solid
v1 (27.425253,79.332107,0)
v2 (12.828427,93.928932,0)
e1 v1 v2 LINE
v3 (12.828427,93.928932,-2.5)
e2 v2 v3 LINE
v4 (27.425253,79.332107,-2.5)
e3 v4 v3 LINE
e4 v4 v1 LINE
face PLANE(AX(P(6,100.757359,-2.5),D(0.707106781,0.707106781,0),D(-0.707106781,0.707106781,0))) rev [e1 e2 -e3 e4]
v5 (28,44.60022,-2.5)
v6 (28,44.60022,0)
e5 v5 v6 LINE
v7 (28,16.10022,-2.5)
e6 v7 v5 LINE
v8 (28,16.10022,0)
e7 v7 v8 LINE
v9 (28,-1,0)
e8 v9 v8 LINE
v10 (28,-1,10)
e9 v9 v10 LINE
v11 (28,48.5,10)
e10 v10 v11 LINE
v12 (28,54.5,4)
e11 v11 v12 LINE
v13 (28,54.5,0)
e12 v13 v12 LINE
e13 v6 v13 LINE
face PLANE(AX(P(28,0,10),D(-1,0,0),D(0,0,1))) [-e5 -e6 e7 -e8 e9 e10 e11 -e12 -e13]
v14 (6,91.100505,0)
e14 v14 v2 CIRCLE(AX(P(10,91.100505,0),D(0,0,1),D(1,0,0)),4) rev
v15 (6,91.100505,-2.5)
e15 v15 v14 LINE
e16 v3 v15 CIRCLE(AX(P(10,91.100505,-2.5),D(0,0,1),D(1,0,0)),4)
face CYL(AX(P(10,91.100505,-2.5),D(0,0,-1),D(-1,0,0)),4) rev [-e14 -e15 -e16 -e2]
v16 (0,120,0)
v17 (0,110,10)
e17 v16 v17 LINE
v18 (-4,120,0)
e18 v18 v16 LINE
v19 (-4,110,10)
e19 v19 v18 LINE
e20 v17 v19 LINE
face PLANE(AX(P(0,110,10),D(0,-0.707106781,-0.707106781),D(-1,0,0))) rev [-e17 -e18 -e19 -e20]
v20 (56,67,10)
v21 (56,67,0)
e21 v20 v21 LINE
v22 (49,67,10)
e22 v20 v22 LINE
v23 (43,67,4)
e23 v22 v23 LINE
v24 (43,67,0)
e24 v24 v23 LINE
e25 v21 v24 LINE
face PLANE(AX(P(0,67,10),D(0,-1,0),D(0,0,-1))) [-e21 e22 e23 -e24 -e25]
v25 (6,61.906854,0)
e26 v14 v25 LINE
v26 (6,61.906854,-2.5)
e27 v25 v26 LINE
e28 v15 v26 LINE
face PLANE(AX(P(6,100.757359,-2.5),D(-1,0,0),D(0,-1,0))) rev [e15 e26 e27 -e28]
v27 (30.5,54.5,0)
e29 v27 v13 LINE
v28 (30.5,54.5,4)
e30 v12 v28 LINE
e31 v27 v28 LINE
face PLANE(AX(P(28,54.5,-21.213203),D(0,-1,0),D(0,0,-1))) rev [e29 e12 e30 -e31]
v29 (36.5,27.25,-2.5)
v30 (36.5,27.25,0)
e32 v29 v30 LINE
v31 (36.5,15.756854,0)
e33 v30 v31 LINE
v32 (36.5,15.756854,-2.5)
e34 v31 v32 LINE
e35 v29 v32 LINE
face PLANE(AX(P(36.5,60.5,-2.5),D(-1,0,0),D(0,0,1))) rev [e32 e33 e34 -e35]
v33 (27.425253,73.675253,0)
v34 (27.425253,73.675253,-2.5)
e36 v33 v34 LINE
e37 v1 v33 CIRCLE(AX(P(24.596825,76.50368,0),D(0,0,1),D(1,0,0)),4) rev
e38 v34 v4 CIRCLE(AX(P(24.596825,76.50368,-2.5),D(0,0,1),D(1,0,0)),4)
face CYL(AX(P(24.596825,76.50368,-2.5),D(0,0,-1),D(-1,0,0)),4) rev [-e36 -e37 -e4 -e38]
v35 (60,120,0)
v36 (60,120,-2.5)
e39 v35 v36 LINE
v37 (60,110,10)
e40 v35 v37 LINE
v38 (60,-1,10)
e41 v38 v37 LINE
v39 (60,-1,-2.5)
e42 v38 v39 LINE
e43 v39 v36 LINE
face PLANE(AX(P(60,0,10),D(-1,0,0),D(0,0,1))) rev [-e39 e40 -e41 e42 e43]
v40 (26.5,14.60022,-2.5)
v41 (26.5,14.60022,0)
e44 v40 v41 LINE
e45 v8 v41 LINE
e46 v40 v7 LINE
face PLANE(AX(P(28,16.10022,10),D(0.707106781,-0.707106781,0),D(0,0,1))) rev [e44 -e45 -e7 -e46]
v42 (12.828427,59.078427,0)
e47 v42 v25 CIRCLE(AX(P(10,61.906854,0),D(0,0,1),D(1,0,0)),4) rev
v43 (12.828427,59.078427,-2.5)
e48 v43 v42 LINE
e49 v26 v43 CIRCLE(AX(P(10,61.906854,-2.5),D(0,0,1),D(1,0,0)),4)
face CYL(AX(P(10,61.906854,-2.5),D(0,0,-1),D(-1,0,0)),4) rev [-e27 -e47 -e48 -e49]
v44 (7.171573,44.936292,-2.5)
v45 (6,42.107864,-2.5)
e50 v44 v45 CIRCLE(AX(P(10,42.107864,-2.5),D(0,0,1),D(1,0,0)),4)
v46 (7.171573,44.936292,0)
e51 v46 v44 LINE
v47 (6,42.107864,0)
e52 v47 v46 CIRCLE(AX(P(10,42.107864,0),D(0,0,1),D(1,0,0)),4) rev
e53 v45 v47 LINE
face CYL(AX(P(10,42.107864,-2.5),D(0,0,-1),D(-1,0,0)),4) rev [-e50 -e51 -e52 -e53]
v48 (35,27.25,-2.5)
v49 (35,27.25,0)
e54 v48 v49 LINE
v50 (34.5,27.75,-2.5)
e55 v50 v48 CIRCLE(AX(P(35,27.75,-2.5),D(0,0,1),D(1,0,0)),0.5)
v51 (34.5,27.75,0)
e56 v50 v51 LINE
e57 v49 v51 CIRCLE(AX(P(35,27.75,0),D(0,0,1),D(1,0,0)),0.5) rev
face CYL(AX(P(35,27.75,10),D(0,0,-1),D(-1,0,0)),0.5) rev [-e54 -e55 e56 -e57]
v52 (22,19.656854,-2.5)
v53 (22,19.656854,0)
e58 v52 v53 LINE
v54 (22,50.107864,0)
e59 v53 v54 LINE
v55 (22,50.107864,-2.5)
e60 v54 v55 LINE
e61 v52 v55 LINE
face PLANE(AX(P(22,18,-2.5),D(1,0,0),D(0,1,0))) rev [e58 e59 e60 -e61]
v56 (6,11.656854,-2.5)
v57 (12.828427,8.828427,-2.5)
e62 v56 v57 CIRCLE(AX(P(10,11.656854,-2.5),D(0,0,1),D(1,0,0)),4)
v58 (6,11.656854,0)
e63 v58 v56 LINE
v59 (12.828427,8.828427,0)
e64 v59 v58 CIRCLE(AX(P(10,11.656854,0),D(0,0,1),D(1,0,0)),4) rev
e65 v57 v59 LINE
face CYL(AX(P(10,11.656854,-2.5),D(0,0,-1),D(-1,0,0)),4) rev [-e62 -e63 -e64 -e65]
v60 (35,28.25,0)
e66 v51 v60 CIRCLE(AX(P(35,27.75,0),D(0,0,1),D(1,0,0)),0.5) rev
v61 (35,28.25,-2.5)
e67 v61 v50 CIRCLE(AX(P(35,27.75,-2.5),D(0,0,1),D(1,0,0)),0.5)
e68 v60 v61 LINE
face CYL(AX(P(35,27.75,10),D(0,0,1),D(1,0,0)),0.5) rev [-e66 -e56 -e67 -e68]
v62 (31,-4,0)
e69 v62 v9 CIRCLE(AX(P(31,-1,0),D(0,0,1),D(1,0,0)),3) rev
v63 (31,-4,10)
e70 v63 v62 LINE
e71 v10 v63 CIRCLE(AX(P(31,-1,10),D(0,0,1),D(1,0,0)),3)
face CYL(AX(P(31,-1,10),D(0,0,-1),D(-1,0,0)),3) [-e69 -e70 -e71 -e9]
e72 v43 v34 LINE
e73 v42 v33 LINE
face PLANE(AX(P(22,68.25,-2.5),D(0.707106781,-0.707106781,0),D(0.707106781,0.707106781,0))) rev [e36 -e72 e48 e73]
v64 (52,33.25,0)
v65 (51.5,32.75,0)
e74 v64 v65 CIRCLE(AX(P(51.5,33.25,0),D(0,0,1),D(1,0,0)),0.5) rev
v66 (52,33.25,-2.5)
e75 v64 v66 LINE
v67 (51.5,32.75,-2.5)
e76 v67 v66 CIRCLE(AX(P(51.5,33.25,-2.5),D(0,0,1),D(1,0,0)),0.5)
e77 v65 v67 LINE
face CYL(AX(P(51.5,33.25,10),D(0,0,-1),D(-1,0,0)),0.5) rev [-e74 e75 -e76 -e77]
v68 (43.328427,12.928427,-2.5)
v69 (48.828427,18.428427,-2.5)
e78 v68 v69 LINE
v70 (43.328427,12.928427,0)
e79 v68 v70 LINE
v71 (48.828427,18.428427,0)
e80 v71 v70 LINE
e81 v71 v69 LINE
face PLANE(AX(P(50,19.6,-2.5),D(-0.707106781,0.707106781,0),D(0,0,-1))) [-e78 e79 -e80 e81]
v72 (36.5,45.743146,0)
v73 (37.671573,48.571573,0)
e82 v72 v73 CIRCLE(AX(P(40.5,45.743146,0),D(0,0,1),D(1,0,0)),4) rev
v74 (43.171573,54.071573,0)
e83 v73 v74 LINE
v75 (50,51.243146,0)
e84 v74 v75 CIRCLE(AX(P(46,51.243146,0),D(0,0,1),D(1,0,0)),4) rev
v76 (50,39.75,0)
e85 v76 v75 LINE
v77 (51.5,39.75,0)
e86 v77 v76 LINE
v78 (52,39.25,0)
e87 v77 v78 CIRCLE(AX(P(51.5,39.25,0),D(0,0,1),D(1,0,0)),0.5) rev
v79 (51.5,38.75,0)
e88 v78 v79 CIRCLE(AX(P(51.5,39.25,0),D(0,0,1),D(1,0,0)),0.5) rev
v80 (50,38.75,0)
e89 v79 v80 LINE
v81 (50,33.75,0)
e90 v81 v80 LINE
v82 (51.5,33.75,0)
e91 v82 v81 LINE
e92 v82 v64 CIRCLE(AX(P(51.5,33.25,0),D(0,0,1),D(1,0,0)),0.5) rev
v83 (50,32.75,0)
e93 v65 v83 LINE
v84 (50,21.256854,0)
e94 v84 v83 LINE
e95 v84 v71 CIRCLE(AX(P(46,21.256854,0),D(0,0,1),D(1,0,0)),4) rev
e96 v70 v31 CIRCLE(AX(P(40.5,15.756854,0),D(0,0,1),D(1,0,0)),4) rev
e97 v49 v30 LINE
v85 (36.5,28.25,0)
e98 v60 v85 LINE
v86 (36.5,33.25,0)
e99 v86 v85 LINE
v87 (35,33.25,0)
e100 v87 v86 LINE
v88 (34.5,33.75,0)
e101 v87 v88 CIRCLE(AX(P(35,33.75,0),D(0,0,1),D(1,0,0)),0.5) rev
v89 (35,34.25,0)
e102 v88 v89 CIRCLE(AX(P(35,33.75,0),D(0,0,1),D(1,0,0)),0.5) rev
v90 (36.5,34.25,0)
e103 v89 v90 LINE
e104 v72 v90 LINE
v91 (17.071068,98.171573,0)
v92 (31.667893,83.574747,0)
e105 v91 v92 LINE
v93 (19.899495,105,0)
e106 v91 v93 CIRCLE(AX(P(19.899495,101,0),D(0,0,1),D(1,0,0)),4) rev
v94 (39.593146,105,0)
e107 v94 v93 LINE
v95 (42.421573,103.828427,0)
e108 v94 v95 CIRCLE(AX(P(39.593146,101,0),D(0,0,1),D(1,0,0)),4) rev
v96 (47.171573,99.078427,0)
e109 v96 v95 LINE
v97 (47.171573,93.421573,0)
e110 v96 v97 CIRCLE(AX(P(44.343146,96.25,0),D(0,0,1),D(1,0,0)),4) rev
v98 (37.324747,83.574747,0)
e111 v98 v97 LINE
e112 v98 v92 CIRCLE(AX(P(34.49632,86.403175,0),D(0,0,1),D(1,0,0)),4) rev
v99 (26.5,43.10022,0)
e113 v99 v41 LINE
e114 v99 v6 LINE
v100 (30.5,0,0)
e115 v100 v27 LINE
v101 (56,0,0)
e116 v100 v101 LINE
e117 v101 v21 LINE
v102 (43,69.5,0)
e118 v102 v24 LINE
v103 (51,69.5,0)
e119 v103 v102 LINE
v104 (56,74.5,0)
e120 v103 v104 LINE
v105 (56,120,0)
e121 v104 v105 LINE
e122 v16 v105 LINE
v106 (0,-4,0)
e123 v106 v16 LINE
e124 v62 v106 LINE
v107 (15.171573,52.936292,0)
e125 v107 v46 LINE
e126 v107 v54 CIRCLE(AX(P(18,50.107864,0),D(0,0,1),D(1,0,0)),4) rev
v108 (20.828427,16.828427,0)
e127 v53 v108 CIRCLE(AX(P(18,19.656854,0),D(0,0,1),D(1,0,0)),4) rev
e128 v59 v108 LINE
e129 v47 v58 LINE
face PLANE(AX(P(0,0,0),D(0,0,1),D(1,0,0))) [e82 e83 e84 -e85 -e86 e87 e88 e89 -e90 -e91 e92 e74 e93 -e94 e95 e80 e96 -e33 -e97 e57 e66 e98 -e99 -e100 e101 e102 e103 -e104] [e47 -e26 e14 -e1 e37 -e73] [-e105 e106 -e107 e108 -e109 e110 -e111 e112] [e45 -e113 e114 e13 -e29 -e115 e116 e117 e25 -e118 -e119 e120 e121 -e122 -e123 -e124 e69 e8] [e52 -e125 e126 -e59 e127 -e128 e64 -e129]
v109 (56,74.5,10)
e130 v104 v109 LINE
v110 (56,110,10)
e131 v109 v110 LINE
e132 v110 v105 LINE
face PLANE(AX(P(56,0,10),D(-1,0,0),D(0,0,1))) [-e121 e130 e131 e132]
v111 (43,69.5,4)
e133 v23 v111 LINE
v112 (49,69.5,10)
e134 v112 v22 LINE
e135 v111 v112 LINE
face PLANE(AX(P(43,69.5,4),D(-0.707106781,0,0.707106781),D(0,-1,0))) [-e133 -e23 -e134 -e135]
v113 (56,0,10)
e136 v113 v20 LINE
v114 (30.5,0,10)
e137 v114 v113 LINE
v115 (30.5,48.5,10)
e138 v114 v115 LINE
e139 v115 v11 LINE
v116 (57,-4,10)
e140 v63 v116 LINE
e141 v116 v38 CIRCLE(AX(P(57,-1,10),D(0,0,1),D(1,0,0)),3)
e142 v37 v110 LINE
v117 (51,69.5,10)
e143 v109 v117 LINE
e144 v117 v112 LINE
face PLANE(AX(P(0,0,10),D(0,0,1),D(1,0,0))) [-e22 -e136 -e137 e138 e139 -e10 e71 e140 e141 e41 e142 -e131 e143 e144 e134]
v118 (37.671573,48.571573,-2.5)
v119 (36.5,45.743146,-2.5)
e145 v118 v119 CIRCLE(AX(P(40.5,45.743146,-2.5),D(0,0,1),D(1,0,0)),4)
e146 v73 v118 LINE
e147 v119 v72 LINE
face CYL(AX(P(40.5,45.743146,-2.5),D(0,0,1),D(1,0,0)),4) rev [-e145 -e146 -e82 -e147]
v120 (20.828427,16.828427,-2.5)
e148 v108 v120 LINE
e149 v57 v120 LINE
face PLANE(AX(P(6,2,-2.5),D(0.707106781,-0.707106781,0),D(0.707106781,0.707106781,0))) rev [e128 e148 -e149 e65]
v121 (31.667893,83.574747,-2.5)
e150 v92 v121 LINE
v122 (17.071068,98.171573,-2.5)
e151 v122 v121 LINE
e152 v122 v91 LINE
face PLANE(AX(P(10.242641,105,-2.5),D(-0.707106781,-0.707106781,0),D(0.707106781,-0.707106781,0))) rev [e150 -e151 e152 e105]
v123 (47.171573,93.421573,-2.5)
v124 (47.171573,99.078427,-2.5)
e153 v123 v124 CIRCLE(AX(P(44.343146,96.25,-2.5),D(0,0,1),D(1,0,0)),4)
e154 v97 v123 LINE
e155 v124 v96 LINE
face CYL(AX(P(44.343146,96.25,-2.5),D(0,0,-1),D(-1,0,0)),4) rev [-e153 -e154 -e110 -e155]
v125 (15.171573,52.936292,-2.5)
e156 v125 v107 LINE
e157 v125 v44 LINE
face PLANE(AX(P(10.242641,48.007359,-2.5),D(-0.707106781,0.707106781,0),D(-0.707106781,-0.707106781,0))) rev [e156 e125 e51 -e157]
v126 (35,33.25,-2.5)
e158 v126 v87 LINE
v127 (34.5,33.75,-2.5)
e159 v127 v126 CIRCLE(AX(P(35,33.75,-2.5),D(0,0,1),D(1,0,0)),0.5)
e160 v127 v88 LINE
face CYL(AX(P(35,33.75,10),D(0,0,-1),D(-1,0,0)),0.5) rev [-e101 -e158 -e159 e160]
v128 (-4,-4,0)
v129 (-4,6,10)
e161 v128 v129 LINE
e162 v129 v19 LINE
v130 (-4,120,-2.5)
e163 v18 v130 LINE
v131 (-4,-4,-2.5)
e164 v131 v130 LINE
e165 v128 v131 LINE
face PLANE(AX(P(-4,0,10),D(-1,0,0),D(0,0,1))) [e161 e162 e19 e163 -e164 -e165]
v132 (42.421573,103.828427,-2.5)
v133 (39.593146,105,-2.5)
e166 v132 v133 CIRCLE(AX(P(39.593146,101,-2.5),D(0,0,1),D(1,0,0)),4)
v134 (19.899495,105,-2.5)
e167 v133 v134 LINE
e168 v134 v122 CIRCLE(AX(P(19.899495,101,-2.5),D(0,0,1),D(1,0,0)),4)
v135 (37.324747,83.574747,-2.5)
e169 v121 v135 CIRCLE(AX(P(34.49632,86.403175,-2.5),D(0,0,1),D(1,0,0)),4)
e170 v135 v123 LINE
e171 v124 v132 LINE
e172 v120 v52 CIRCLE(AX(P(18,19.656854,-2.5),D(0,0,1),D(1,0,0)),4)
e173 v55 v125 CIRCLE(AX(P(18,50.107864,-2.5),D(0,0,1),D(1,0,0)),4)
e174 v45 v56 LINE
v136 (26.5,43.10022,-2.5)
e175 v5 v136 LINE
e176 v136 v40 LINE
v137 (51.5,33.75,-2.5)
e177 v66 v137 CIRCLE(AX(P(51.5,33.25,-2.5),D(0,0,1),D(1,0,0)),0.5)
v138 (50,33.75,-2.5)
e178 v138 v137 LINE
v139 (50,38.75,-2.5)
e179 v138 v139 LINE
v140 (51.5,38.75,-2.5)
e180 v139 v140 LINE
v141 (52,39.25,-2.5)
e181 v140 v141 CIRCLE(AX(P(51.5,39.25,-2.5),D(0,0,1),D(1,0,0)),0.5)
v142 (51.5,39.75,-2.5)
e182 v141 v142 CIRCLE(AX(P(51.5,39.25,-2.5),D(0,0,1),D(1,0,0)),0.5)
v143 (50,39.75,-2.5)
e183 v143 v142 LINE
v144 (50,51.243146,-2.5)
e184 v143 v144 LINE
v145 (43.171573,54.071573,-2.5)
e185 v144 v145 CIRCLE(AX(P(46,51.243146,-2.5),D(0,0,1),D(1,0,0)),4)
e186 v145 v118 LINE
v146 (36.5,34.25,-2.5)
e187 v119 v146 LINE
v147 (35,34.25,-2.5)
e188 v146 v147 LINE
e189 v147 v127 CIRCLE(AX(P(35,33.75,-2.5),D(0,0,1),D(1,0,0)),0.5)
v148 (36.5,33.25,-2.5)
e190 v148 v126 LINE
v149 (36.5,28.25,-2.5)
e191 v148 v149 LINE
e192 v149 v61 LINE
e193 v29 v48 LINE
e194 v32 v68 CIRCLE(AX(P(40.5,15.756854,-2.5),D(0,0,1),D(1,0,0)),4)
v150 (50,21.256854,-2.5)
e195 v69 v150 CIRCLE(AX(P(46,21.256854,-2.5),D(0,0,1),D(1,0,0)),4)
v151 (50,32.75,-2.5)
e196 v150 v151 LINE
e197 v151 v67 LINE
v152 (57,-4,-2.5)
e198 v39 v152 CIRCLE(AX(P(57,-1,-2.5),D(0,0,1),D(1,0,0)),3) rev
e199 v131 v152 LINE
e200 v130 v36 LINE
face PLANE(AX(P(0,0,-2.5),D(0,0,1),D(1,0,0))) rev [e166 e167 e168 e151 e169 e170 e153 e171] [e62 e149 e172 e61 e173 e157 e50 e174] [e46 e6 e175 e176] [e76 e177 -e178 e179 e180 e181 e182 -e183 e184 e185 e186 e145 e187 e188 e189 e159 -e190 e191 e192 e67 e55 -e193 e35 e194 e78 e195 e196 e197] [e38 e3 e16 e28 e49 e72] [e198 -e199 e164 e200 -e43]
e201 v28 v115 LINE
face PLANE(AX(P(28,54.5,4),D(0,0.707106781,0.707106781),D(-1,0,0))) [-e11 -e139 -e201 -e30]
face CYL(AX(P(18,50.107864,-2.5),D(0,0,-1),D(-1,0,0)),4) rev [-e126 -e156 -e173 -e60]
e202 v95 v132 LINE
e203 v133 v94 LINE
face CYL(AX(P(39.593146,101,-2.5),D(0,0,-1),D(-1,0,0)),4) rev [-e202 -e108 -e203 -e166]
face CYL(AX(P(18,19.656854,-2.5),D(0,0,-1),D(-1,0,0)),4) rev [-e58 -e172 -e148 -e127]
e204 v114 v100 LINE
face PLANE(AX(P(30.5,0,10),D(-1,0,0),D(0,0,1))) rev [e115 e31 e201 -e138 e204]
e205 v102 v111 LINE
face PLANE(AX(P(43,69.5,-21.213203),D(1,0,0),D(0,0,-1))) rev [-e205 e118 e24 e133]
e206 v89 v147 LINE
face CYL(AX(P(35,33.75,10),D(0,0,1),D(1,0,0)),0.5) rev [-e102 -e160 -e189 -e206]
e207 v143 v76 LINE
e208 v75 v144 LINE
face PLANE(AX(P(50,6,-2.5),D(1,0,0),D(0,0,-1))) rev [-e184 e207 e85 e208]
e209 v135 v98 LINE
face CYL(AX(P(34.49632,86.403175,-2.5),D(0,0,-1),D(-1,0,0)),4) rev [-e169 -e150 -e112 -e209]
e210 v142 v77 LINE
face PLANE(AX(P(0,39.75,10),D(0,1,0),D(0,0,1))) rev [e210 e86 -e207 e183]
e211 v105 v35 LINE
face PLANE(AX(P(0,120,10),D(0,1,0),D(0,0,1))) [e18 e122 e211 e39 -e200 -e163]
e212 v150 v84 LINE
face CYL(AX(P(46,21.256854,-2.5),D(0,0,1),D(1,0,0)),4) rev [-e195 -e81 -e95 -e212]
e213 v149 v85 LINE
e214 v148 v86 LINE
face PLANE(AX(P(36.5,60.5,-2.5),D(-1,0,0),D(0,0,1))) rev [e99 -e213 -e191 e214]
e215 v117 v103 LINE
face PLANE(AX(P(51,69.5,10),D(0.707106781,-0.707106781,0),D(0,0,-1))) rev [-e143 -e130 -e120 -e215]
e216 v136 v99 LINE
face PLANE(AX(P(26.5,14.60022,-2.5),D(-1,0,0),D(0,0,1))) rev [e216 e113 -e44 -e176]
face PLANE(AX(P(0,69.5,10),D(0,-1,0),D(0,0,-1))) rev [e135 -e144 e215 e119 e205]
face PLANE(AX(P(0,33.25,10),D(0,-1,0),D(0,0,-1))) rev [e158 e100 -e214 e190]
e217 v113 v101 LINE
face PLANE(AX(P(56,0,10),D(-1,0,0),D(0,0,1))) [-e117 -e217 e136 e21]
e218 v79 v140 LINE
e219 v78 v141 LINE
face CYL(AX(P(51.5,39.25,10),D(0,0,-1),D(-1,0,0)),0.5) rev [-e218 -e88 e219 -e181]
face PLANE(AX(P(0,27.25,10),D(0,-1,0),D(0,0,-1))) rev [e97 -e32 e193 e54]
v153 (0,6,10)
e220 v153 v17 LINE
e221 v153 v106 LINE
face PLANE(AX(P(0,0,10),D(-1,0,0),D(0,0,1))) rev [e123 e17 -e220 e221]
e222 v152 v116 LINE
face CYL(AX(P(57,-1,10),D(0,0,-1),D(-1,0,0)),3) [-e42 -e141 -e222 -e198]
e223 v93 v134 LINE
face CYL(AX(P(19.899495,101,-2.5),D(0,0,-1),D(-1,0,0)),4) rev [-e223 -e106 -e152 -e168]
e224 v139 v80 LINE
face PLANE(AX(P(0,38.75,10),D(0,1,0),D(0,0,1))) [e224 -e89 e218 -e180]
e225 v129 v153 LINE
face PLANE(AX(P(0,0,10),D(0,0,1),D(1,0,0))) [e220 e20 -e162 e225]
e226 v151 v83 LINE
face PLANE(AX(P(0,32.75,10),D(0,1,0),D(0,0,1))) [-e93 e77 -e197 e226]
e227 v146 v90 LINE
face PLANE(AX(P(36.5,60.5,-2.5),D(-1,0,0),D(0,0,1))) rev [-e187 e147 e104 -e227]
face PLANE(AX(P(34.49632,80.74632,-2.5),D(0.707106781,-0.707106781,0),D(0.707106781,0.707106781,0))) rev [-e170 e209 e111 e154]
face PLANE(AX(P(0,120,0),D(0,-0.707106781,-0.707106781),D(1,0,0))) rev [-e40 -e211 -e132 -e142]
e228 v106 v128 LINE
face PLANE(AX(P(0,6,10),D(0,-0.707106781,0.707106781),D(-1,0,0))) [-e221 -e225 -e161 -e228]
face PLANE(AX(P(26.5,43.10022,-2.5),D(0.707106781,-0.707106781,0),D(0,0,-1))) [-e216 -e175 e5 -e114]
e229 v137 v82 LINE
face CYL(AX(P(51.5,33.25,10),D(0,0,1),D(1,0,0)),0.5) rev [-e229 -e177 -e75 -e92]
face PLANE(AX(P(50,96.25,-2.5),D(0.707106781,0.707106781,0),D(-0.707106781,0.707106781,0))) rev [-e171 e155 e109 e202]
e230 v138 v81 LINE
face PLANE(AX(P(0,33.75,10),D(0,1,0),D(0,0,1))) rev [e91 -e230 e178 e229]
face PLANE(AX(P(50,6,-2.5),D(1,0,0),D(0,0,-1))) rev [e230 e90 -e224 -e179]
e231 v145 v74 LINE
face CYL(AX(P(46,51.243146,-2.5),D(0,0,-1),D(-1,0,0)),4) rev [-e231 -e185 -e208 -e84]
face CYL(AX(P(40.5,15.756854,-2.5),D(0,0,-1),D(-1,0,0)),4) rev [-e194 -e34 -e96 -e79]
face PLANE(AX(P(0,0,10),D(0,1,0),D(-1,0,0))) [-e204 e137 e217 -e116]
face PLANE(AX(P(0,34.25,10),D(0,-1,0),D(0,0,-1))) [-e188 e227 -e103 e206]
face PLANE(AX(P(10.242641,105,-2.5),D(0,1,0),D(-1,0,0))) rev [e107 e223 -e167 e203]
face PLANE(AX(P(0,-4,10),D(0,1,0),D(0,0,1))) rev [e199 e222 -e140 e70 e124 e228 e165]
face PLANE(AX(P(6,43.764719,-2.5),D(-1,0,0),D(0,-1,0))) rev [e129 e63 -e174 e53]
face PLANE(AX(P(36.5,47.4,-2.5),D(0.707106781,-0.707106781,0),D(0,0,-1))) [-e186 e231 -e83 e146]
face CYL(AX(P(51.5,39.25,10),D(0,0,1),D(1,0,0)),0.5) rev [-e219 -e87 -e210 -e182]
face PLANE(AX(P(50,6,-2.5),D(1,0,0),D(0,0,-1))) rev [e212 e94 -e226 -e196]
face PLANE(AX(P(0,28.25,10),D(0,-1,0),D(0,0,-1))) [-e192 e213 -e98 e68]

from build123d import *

# Parameters (mm, degrees)
BOSS_EXTRUDE1_DEPTH     = 10
SKETCH1_3_W             = 25.5
SKETCH1_3_H             = 67
BOSS_EXTRUDE2_DEPTH     = 2.5
CHAMFER1_SIZE           = 10
SKETCH2_W               = 15
SKETCH2_H               = 15
CUT_EXTRUDE1_DEPTH      = 10
CHAMFER2_SIZE           = 5
SKETCH3_W               = 28
SKETCH3_H               = 4
CUT_EXTRUDE2_DEPTH      = 10
FILLET2_R               = 3
FILLET3_R               = 3
CHAMFER3_SIZE           = 10
CUT_EXTRUDE3_DEPTH      = 2.5
CHAMFER4_SIZE           = 13.6
FILLET4_R               = 4
CHAMFER5_SIZE           = 6
CUT_EXTRUDE4_DEPTH      = 135.536240471
CUT_EXTRUDE4_DEPTH_BACK = 2.5
FILLET6_R               = 0.5
SKETCH7_W               = 1.5
SKETCH7_H               = 30
CUT_EXTRUDE5_DEPTH      = 2.5
CHAMFER6_SIZE           = 1.5
FILLET7_R               = 0.5


# Some blends are built 0.0001 mm under size
with BuildPart() as part:
    # Sketch1 → Boss-Extrude1 (new body)
    with BuildSketch(Plane.XY):
        Polygon((56, 67), (56, 69.5), (28, 69.5), (28, 0), (30.5, 0), (30.5, 67), align=None)
        Polygon((56, 120), (56, 69.5), (56, 67), (56, 0), (30.5, 0), (28, 0), (0, 0), (0, 120), (-4, 120), (-4, -4), (60, -4), (60, 120), align=None)
    extrude(amount=BOSS_EXTRUDE1_DEPTH)

    # Sketch1<3> → Boss-Extrude2 (add)
    with BuildSketch(Plane.XY):
        Polygon((28, 69.5), (56, 69.5), (56, 120), (0, 120), (0, 0), (28, 0), align=None)
        with Locations((43.25, 33.5)):
            Rectangle(SKETCH1_3_W, SKETCH1_3_H)
        Polygon((56, 120), (56, 69.5), (56, 67), (56, 0), (30.5, 0), (28, 0), (0, 0), (0, 120), (-4, 120), (-4, -4), (60, -4), (60, 120), align=None)
        Polygon((56, 67), (56, 69.5), (28, 69.5), (28, 0), (30.5, 0), (30.5, 67), align=None)
    extrude(amount=-BOSS_EXTRUDE2_DEPTH)

    # Chamfer1
    chamfer1_edges = [part.edges().sort_by_distance(p)[0] for p in [
        (58, 120, 10),
        (-2, 120, 10),
    ]]
    chamfer(chamfer1_edges, length=CHAMFER1_SIZE)

    # Sketch2 → Cut-Extrude1 (cut)
    with BuildSketch(Plane.XY.offset(10)):
        with Locations((35.5, 62)):
            Rectangle(SKETCH2_W, SKETCH2_H)
    extrude(amount=-CUT_EXTRUDE1_DEPTH, mode=Mode.SUBTRACT)

    # Chamfer2
    chamfer2_edges = [part.edges().sort_by_distance(p)[0] for p in [
        (56, 69.5, 5),
    ]]
    chamfer(chamfer2_edges, length=CHAMFER2_SIZE)

    # Sketch3 → Cut-Extrude2 (cut)
    with BuildSketch(Plane.XY.offset(10)):
        with Locations((14, -2)):
            Rectangle(SKETCH3_W, SKETCH3_H)
    extrude(amount=-CUT_EXTRUDE2_DEPTH, mode=Mode.SUBTRACT)

    # Fillet2
    fillet2_edges = [part.edges().sort_by_distance(p)[0] for p in [
        (28, -4, 5),
    ]]
    fillet(fillet2_edges, radius=FILLET2_R)

    # Fillet3
    fillet3_edges = [part.edges().sort_by_distance(p)[0] for p in [
        (60, -4, 3.75),
    ]]
    fillet(fillet3_edges, radius=FILLET3_R)

    # Chamfer3
    chamfer3_edges = [part.edges().sort_by_distance(p)[0] for p in [
        (-2, -4, 10),
    ]]
    chamfer(chamfer3_edges, length=CHAMFER3_SIZE)

    # Sketch4 → Cut-Extrude3 (cut)
    with BuildSketch(Plane.XY):
        Polygon((36.5, 60.5), (36.5, 61), (37, 61), (50, 61), (50, 6), (36.5, 6), align=None)
        Polygon((10.242640687, 105), (41.25, 105), (50, 96.25), (34.496320344, 80.746320344), align=None)
        Polygon((22, 68.25), (30.253679656, 76.503679656), (6, 100.757359313), (6, 52.25), align=None)
        Polygon((22, 59.764718626), (10.242640687, 48.007359313), (6, 43.764718626), (6, 2), (22, 18), align=None)
    extrude(amount=-CUT_EXTRUDE3_DEPTH, mode=Mode.SUBTRACT)

    # Chamfer4
    # the kernel refuses this chamfer: 13.6 mm, written as the material it adds along each edge
    with BuildSketch(Plane(origin=(50, 6, 0), x_dir=(-0.9996219169112968, -0.0274958766105864, 0), z_dir=(0, 0, -1))) as chamfer4_piece_1:
        Polygon((CHAMFER4_SIZE * 0.999621916911, CHAMFER4_SIZE * 0.0274958766106), (-CHAMFER4_SIZE * 0.0274958766106, CHAMFER4_SIZE * 0.999621916911), (0, 0), align=None)
    extrude(amount=2.5)
    with BuildSketch(Plane(origin=(36.5, 61, 0), x_dir=(-0.027495876610586337, -0.9996219169112968, 0), z_dir=(0, 0, -1))) as chamfer4_piece_2:
        Polygon((CHAMFER4_SIZE * 0.999621916911, -CHAMFER4_SIZE * 0.0274958766106), (-CHAMFER4_SIZE * 0.0274958766106, -CHAMFER4_SIZE * 0.999621916911), (0, 0), align=None)
    extrude(amount=2.5)

    # Fillet4
    fillet4_edges = [part.edges().sort_by_distance(p)[0] for p in [
        (22, 18, -1.25),
        (6, 2, -1.25),
        (6, 43.764718626, -1.25),
        (22, 59.764718626, -1.25),
        (6, 52.25, -1.25),
        (6, 100.757359313, -1.25),
        (30.253679656, 76.503679656, -1.25),
        (41.25, 105, -1.25),
        (50, 96.25, -1.25),
        (34.496320344, 80.746320344, -1.25),
        (10.242640687, 105, -1.25),
        (50, 60.9, -1.25),
        (50, 19.6, -1.25),
        (36.5, 47.4, -1.25),
        (36.5, 6.1, -1.25),
    ]]
    fillet(fillet4_edges, radius=FILLET4_R)

    # Chamfer5
    chamfer5_edges = [part.edges().sort_by_distance(p)[0] for p in [
        (29.25, 54.5, 10),
        (43, 68.25, 10),
    ]]
    chamfer(chamfer5_edges, length=CHAMFER5_SIZE)

    # Sketch6 → Cut-Extrude4 (cut, two sides: drawn at the far end of the back side and taken through both)
    with BuildSketch(Plane.XY.offset(-CUT_EXTRUDE4_DEPTH_BACK)):
        Polygon((34.5, 33.25), (36.5, 33.25), (36.5, 33.75), (36.5, 34.25), (34.5, 34.25), align=None)
        Polygon((36.5, 27.25), (36.5, 27.75), (36.5, 28.25), (34.5, 28.25), (34.5, 27.25), align=None)
        Polygon((50, 33.75), (50, 33.25), (50, 32.75), (52, 32.75), (52, 33.75), align=None)
        Polygon((50, 39.25), (50, 38.75), (52, 38.75), (52, 39.75), (50, 39.75), align=None)
    extrude(amount=CUT_EXTRUDE4_DEPTH + CUT_EXTRUDE4_DEPTH_BACK, mode=Mode.SUBTRACT)

    # Fillet6
    fillet6_edges = [part.edges().sort_by_distance(p)[0] for p in [
        (52, 38.75, -1.25),
        (52, 39.75, -1.25),
        (34.5, 27.25, -1.25),
        (34.5, 28.25, -1.25),
        (34.5, 33.25, -1.25),
        (34.5, 34.25, -1.25),
    ]]
    fillet(fillet6_edges, radius=FILLET6_R - 0.0001)  # a hair under: the kernel refuses the full size

    # Sketch7 → Cut-Extrude5 (cut)
    with BuildSketch(Plane.XY):
        with Locations((27.25, 29.600220455)):
            Rectangle(SKETCH7_W, SKETCH7_H)
    extrude(amount=-CUT_EXTRUDE5_DEPTH, mode=Mode.SUBTRACT)

    # Chamfer6
    chamfer6_edges = [part.edges().sort_by_distance(p)[0] for p in [
        (28, 14.600220455, -1.25),
        (26.5, 44.600220455, -1.25),
    ]]
    chamfer(chamfer6_edges, length=CHAMFER6_SIZE - 0.0001)  # a hair under: the kernel refuses the full size

    # Fillet7
    fillet7_edges = [part.edges().sort_by_distance(p)[0] for p in [
        (52, 32.75, -1.25),
        (52, 33.75, -1.25),
    ]]
    fillet(fillet7_edges, radius=FILLET7_R - 0.0001)  # a hair under: the kernel refuses the full size


solid = part.part
